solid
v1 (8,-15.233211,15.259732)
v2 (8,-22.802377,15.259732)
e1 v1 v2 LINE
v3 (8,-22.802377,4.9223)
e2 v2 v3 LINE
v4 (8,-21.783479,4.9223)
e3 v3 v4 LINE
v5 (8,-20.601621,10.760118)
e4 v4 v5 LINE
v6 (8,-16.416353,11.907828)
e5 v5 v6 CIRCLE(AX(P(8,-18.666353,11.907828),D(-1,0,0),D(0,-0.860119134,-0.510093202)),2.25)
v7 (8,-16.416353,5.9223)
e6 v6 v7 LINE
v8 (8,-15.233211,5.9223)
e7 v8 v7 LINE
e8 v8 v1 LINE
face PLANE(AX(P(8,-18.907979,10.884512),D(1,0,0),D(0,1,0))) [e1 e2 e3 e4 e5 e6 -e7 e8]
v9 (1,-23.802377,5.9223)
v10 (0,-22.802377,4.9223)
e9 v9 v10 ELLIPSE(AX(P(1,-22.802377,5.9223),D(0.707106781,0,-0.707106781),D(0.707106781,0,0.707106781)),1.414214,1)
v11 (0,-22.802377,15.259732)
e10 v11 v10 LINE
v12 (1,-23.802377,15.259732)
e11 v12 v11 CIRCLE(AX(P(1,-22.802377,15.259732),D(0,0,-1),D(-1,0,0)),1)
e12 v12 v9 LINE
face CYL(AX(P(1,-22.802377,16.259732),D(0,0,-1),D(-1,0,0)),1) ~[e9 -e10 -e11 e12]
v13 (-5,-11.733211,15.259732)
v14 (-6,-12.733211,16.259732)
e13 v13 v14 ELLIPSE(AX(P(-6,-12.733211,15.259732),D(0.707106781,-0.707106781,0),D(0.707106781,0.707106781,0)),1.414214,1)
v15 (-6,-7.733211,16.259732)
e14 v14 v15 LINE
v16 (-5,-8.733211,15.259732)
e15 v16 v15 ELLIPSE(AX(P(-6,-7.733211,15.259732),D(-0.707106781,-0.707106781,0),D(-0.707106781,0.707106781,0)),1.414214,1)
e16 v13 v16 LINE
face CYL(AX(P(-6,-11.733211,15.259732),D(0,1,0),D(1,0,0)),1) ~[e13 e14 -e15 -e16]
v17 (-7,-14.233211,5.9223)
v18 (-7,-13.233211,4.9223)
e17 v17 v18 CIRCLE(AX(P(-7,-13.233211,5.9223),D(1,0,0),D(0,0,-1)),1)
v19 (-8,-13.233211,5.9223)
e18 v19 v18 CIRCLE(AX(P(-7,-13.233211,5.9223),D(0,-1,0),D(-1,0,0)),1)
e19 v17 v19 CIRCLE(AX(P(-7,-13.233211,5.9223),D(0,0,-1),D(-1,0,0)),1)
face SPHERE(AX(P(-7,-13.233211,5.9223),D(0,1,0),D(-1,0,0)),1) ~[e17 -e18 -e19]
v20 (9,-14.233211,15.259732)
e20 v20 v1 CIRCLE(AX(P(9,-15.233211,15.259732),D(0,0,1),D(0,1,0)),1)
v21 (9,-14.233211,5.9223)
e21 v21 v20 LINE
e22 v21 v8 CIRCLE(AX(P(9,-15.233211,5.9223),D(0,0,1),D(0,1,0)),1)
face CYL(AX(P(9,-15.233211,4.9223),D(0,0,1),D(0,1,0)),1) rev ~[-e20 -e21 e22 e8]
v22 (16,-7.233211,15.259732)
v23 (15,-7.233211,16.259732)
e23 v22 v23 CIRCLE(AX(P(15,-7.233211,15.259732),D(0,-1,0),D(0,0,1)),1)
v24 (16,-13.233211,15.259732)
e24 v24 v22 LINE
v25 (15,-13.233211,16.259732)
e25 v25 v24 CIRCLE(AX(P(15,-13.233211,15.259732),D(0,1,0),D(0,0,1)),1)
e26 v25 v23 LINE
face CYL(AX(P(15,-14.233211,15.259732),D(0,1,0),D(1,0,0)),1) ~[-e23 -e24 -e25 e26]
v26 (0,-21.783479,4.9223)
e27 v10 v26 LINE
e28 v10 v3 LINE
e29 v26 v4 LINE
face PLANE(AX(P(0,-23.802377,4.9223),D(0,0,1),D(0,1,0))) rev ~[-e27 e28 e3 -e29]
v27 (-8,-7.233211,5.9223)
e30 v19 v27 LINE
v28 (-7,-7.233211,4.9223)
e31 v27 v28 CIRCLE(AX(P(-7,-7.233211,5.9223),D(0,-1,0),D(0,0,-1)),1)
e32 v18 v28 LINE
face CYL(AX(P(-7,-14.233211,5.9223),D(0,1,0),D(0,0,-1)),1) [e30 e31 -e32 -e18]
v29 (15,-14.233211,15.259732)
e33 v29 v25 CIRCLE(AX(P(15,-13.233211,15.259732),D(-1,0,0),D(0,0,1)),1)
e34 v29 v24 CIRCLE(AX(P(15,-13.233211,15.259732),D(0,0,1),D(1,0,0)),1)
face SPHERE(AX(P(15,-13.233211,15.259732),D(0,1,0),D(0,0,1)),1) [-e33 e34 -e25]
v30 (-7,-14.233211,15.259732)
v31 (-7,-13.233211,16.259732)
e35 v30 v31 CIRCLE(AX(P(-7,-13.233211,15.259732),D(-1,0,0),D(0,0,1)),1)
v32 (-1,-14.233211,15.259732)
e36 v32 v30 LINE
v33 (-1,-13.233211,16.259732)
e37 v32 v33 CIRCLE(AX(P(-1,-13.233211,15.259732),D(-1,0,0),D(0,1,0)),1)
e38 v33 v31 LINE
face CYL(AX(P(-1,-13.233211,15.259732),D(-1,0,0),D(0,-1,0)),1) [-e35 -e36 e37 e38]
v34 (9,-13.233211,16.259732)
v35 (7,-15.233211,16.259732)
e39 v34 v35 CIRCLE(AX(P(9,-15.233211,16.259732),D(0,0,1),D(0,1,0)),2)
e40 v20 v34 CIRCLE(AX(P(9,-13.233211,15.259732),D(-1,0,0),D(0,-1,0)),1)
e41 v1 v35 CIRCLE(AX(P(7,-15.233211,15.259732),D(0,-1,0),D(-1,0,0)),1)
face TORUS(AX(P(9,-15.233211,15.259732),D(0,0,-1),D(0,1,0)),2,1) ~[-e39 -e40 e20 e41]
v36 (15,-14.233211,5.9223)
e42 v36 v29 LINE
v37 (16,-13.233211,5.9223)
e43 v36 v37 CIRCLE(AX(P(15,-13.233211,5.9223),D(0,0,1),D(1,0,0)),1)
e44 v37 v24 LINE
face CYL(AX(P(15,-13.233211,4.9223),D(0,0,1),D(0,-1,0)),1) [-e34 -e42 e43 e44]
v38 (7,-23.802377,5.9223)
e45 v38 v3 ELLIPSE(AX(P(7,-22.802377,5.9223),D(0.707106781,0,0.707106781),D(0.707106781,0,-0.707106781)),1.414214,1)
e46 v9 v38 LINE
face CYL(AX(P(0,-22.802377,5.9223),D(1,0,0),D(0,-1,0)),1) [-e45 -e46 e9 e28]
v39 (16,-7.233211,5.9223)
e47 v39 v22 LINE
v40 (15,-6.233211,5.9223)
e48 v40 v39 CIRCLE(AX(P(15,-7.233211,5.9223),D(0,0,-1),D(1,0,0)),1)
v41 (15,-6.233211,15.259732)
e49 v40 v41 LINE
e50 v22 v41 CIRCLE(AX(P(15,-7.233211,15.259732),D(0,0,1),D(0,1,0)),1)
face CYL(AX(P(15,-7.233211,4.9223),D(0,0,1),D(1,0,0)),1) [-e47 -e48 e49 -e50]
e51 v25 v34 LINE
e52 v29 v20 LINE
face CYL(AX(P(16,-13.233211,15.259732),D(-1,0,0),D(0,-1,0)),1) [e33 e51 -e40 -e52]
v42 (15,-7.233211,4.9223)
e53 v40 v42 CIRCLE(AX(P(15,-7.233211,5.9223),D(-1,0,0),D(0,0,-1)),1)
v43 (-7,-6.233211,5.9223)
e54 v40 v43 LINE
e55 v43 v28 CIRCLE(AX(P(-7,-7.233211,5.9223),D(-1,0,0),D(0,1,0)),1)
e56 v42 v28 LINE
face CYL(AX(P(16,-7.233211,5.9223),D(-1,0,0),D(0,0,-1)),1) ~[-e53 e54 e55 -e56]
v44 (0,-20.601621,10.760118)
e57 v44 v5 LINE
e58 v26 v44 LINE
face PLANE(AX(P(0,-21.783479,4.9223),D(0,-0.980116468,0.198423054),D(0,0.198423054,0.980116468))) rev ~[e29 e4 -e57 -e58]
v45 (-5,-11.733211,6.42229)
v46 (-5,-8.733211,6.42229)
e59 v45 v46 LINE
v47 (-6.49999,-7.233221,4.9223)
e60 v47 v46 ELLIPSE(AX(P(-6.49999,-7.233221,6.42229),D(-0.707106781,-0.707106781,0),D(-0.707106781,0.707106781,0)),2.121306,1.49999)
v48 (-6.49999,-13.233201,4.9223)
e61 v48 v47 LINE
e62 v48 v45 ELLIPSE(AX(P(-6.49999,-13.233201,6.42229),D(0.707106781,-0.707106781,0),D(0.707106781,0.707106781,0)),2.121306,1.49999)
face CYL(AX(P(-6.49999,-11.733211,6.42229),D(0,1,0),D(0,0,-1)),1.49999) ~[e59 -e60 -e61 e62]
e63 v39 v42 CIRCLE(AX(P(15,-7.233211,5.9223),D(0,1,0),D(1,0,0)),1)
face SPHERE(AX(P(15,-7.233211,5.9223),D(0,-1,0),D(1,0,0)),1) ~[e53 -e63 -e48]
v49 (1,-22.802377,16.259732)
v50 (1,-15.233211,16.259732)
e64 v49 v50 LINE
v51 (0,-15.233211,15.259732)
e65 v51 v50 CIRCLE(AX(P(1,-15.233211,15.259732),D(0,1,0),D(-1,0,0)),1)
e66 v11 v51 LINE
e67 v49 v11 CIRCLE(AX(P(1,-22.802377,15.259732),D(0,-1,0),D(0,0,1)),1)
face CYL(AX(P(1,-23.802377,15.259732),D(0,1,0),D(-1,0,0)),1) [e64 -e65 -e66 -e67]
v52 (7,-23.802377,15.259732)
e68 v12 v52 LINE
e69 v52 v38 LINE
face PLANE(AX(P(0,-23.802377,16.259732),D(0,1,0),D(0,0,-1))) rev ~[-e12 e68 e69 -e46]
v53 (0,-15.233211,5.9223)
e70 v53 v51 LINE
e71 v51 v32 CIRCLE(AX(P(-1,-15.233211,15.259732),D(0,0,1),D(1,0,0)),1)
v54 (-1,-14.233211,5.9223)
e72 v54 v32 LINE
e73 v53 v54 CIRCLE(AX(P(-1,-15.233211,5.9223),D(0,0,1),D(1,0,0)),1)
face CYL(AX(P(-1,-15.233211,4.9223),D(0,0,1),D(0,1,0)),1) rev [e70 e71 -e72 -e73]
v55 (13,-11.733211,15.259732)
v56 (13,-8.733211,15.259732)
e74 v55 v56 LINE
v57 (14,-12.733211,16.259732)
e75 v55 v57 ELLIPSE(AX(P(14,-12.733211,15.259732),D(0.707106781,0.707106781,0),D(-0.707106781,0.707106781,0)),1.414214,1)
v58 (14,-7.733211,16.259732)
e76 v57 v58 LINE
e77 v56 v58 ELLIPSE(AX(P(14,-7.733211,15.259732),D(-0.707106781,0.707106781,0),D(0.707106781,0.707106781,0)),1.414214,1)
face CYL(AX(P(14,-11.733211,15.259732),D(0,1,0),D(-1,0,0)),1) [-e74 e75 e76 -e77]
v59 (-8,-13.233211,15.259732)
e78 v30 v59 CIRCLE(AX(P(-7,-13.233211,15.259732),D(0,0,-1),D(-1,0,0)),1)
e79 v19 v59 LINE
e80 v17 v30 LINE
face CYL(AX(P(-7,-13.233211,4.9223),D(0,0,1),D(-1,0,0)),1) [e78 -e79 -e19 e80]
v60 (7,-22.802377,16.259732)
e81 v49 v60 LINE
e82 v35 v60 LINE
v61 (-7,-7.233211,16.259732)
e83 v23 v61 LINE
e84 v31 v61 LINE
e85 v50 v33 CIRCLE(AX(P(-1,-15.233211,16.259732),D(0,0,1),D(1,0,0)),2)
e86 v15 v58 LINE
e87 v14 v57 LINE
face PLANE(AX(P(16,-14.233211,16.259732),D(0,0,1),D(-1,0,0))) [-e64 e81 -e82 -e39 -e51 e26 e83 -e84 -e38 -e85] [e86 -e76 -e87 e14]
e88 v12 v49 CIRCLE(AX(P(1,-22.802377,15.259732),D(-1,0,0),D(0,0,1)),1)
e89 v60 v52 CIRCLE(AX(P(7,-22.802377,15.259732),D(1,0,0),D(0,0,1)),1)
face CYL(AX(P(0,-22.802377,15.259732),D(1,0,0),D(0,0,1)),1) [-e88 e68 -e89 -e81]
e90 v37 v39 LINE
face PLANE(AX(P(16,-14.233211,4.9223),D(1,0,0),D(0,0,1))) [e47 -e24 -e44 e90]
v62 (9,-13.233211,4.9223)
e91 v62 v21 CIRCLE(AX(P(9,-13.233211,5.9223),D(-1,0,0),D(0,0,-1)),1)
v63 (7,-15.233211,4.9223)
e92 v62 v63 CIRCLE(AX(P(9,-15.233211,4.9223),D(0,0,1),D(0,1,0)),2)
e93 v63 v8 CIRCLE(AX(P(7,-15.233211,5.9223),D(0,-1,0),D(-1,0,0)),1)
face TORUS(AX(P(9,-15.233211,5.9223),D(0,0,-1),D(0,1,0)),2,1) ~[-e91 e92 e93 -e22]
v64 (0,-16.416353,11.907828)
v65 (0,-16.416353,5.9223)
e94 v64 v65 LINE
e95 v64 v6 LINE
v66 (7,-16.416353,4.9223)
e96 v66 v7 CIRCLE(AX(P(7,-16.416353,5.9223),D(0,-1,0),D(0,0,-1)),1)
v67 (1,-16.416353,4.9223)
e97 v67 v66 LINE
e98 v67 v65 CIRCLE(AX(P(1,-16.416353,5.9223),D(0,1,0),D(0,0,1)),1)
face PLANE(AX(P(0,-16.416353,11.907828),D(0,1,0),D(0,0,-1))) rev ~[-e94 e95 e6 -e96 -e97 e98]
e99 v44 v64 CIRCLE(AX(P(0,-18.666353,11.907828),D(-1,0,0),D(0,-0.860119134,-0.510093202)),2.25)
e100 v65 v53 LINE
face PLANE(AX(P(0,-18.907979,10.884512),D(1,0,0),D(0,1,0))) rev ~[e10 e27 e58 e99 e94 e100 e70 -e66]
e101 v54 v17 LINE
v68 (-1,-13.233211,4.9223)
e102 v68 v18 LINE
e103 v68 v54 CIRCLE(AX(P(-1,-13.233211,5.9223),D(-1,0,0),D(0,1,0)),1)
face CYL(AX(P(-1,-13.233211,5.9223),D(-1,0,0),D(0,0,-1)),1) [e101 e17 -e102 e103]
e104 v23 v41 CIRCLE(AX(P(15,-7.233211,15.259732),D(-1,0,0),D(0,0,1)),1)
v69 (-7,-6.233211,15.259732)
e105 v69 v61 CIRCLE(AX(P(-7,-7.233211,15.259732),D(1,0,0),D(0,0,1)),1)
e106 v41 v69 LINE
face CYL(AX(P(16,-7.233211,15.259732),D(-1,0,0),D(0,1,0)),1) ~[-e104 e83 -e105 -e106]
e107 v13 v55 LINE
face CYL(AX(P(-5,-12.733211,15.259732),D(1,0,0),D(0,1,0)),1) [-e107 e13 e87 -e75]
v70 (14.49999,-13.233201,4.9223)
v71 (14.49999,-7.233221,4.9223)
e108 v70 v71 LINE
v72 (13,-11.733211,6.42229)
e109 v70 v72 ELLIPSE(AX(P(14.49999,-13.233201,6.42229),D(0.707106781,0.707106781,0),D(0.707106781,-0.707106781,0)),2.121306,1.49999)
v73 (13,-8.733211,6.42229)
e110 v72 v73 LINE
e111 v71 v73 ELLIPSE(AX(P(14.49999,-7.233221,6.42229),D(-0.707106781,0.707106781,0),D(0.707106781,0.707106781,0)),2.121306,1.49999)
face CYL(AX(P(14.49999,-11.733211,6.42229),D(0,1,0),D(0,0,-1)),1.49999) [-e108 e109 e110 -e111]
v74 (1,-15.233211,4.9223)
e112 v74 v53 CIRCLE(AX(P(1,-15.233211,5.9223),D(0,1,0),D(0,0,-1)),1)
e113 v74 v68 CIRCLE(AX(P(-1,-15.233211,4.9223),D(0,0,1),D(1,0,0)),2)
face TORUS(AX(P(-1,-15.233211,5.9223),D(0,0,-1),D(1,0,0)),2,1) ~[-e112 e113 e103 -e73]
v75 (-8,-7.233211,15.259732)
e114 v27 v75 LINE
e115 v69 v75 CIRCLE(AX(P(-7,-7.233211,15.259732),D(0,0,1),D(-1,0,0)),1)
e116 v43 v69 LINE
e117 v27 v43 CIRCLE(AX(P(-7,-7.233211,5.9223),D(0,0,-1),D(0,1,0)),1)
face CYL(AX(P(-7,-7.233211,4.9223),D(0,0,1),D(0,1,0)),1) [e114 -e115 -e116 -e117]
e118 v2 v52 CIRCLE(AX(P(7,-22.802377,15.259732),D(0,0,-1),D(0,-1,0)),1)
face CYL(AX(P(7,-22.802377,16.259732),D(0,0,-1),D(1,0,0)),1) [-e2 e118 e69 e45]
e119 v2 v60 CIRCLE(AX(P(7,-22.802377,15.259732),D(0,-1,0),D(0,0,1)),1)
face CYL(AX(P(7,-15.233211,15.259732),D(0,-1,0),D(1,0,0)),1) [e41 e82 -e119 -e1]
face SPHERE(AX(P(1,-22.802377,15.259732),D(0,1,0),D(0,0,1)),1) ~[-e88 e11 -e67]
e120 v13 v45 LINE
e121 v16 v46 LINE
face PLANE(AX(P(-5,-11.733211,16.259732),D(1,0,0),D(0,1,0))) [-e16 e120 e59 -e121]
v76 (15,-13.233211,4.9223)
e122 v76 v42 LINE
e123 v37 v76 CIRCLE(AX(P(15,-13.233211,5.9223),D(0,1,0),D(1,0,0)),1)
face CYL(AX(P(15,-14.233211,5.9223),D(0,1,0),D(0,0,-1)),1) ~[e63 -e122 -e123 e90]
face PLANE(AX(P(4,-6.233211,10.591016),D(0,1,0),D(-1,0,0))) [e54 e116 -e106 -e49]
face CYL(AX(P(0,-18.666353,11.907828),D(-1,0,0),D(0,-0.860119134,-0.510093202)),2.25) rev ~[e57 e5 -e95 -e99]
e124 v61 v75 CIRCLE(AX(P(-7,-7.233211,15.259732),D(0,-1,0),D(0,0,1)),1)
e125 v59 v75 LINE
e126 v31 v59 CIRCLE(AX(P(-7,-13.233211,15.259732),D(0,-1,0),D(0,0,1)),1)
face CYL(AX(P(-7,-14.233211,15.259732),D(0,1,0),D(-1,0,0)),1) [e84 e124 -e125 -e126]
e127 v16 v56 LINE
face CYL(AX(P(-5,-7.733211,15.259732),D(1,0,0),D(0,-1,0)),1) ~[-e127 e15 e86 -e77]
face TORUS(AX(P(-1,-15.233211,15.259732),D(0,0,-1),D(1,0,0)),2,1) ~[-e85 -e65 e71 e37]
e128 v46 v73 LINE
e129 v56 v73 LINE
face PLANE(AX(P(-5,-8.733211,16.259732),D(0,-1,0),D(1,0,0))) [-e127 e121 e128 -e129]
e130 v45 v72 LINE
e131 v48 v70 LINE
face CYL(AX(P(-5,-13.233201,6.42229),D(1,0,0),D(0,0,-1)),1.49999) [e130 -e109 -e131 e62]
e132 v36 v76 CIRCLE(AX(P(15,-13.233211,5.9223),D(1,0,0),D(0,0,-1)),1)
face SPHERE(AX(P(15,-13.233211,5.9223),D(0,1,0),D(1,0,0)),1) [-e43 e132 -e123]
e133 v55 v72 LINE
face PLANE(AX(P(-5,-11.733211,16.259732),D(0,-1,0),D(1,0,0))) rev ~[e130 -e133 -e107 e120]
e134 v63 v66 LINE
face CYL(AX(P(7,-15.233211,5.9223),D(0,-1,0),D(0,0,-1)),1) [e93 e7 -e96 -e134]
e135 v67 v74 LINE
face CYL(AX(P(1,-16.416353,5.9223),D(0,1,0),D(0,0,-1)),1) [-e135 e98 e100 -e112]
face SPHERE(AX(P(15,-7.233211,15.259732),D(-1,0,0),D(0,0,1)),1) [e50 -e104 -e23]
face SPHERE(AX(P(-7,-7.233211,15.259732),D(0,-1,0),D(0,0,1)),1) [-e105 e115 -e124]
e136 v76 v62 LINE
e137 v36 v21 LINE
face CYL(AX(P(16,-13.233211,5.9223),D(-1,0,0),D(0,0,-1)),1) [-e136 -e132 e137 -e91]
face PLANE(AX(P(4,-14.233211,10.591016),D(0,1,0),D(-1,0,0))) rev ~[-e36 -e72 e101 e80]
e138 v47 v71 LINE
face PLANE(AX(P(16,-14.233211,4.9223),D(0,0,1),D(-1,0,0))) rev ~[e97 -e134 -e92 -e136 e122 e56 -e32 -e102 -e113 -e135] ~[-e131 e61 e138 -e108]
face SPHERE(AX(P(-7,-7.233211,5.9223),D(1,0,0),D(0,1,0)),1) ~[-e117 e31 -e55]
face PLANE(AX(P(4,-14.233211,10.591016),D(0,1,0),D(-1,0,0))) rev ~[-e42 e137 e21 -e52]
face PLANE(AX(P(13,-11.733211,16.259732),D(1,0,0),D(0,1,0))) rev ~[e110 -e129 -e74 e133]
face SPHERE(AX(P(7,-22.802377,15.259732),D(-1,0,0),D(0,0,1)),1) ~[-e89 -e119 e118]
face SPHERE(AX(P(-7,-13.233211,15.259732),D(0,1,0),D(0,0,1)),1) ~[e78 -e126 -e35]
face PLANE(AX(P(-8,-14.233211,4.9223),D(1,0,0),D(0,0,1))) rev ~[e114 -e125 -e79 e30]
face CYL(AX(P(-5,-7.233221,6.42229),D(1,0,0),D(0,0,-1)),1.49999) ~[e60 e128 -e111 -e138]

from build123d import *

# Parameters (mm, degrees)
F1_DEPTH = 8
F2_W     = 24
F2_H     = 11.337432079
F3_DEPTH = 8
F4_W     = 18
F4_H     = 3
F5_DEPTH = 11.338432079
F6_F1_R  = 1
F6_F2_R  = 1
F7_R     = 1.49999


# Not quite as in the source:
# - a fillet or chamfer is up to 0.001 mm smaller than in the source, because OpenCascade refuses the exact size


with BuildPart() as f1:
    # F0 (on Right) → F1 (new body)
    with BuildSketch(Plane.YZ):
        with BuildLine():
            ThreePointArc((-20.601621214, 10.7601184938), (-19.2613938683, 14.0777191086), (-16.4163531623, 11.9078281993))
            Line((-16.4163531623, 11.9078281993), (-16.4163531623, 4.9222996458))
            Line((-16.4163531623, 4.9222996458), (-14.2332110554, 4.9222996458))
            Line((-14.2332110554, 4.9222996458), (-14.2332110554, 16.2597317249))
            Line((-14.2332110554, 16.2597317249), (-23.8023772836, 16.2597317249))
            Line((-23.8023772836, 16.2597317249), (-23.8023772836, 4.9222996458))
            Line((-23.8023772836, 4.9222996458), (-21.7834785581, 4.9222996458))
            Line((-21.7834785581, 4.9222996458), (-20.601621214, 10.7601184938))
        make_face()
    extrude(amount=F1_DEPTH)

    # F2 (on face) → F3 (join)
    with BuildSketch(Plane(origin=(0, -14.2332110554, 0), x_dir=(-1, 0, 0), z_dir=(0, 1, 0))):
        with Locations((-4, 10.5910156853)):
            Rectangle(F2_W, F2_H)
    extrude(amount=F3_DEPTH)

    # F4 (on face) → F5 (cut, through all)
    with BuildSketch(Plane.XY.offset(16.2597317249)):
        with Locations((4, -10.2332110554)):
            Rectangle(F4_W, F4_H)
    extrude(amount=-F5_DEPTH, mode=Mode.SUBTRACT)

    # F6: fillet of radius 1 on 26 edges, made by hand

    # F6_f1
    f6_f1_edges = [f1.edges().sort_by_distance(p)[0] for p in [
        (0, -14.2332110554, 10.5910156853),
        (8, -14.2332110554, 10.5910156853),
    ]]
    fillet(f6_f1_edges, radius=F6_F1_R)

    # F6_f2
    f6_f2_edges = [f1.edges().sort_by_distance(p)[0] for p in [
        (-8, -10.2332110554, 16.2597317249),
        (-4.5, -14.2332110554, 16.2597317249),
        (4, -6.2332110554, 16.2597317249),
        (0, -19.5177941695, 16.2597317249),
        (16, -10.2332110554, 16.2597317249),
        (4, -23.8023772836, 16.2597317249),
        (12.5, -14.2332110554, 16.2597317249),
        (8, -19.5177941695, 16.2597317249),
        (-5, -10.2332110554, 16.2597317249),
        (4, -8.7332110554, 16.2597317249),
        (13, -10.2332110554, 16.2597317249),
        (4, -11.7332110554, 16.2597317249),
        (16, -10.2332110554, 4.9222996458),
        (16, -14.2332110554, 10.5910156853),
        (16, -6.2332110554, 10.5910156853),
        (4, -6.2332110554, 4.9222996458),
        (-8, -6.2332110554, 10.5910156853),
        (-8, -10.2332110554, 4.9222996458),
        (-8, -14.2332110554, 10.5910156853),
        (-4.5, -14.2332110554, 4.9222996458),
        (12.5, -14.2332110554, 4.9222996458),
        (4, -23.8023772836, 4.9222996458),
        (0, -23.8023772836, 10.5910156853),
        (8, -23.8023772836, 10.5910156853),
        (8.2928932188, -14.5261042742, 4.9222996458),
        (-0.2928932188, -14.5261042742, 4.9222996458),
        (8.2928932188, -14.5261042742, 16.2597317249),
        (-0.2928932188, -14.5261042742, 16.2597317249),
    ]]
    fillet(f6_f2_edges, radius=F6_F2_R)

    # F7 (radius 1.5 in the source; OpenCascade refuses exactly that, so slightly less here)
    f7_edges = [f1.edges().sort_by_distance(p)[0] for p in [
        (-5, -10.233211, 4.9223),
        (4, -11.733211, 4.9223),
        (4, -8.733211, 4.9223),
        (13, -10.233211, 4.9223),
    ]]
    fillet(f7_edges, radius=F7_R)


solid = f1.part
